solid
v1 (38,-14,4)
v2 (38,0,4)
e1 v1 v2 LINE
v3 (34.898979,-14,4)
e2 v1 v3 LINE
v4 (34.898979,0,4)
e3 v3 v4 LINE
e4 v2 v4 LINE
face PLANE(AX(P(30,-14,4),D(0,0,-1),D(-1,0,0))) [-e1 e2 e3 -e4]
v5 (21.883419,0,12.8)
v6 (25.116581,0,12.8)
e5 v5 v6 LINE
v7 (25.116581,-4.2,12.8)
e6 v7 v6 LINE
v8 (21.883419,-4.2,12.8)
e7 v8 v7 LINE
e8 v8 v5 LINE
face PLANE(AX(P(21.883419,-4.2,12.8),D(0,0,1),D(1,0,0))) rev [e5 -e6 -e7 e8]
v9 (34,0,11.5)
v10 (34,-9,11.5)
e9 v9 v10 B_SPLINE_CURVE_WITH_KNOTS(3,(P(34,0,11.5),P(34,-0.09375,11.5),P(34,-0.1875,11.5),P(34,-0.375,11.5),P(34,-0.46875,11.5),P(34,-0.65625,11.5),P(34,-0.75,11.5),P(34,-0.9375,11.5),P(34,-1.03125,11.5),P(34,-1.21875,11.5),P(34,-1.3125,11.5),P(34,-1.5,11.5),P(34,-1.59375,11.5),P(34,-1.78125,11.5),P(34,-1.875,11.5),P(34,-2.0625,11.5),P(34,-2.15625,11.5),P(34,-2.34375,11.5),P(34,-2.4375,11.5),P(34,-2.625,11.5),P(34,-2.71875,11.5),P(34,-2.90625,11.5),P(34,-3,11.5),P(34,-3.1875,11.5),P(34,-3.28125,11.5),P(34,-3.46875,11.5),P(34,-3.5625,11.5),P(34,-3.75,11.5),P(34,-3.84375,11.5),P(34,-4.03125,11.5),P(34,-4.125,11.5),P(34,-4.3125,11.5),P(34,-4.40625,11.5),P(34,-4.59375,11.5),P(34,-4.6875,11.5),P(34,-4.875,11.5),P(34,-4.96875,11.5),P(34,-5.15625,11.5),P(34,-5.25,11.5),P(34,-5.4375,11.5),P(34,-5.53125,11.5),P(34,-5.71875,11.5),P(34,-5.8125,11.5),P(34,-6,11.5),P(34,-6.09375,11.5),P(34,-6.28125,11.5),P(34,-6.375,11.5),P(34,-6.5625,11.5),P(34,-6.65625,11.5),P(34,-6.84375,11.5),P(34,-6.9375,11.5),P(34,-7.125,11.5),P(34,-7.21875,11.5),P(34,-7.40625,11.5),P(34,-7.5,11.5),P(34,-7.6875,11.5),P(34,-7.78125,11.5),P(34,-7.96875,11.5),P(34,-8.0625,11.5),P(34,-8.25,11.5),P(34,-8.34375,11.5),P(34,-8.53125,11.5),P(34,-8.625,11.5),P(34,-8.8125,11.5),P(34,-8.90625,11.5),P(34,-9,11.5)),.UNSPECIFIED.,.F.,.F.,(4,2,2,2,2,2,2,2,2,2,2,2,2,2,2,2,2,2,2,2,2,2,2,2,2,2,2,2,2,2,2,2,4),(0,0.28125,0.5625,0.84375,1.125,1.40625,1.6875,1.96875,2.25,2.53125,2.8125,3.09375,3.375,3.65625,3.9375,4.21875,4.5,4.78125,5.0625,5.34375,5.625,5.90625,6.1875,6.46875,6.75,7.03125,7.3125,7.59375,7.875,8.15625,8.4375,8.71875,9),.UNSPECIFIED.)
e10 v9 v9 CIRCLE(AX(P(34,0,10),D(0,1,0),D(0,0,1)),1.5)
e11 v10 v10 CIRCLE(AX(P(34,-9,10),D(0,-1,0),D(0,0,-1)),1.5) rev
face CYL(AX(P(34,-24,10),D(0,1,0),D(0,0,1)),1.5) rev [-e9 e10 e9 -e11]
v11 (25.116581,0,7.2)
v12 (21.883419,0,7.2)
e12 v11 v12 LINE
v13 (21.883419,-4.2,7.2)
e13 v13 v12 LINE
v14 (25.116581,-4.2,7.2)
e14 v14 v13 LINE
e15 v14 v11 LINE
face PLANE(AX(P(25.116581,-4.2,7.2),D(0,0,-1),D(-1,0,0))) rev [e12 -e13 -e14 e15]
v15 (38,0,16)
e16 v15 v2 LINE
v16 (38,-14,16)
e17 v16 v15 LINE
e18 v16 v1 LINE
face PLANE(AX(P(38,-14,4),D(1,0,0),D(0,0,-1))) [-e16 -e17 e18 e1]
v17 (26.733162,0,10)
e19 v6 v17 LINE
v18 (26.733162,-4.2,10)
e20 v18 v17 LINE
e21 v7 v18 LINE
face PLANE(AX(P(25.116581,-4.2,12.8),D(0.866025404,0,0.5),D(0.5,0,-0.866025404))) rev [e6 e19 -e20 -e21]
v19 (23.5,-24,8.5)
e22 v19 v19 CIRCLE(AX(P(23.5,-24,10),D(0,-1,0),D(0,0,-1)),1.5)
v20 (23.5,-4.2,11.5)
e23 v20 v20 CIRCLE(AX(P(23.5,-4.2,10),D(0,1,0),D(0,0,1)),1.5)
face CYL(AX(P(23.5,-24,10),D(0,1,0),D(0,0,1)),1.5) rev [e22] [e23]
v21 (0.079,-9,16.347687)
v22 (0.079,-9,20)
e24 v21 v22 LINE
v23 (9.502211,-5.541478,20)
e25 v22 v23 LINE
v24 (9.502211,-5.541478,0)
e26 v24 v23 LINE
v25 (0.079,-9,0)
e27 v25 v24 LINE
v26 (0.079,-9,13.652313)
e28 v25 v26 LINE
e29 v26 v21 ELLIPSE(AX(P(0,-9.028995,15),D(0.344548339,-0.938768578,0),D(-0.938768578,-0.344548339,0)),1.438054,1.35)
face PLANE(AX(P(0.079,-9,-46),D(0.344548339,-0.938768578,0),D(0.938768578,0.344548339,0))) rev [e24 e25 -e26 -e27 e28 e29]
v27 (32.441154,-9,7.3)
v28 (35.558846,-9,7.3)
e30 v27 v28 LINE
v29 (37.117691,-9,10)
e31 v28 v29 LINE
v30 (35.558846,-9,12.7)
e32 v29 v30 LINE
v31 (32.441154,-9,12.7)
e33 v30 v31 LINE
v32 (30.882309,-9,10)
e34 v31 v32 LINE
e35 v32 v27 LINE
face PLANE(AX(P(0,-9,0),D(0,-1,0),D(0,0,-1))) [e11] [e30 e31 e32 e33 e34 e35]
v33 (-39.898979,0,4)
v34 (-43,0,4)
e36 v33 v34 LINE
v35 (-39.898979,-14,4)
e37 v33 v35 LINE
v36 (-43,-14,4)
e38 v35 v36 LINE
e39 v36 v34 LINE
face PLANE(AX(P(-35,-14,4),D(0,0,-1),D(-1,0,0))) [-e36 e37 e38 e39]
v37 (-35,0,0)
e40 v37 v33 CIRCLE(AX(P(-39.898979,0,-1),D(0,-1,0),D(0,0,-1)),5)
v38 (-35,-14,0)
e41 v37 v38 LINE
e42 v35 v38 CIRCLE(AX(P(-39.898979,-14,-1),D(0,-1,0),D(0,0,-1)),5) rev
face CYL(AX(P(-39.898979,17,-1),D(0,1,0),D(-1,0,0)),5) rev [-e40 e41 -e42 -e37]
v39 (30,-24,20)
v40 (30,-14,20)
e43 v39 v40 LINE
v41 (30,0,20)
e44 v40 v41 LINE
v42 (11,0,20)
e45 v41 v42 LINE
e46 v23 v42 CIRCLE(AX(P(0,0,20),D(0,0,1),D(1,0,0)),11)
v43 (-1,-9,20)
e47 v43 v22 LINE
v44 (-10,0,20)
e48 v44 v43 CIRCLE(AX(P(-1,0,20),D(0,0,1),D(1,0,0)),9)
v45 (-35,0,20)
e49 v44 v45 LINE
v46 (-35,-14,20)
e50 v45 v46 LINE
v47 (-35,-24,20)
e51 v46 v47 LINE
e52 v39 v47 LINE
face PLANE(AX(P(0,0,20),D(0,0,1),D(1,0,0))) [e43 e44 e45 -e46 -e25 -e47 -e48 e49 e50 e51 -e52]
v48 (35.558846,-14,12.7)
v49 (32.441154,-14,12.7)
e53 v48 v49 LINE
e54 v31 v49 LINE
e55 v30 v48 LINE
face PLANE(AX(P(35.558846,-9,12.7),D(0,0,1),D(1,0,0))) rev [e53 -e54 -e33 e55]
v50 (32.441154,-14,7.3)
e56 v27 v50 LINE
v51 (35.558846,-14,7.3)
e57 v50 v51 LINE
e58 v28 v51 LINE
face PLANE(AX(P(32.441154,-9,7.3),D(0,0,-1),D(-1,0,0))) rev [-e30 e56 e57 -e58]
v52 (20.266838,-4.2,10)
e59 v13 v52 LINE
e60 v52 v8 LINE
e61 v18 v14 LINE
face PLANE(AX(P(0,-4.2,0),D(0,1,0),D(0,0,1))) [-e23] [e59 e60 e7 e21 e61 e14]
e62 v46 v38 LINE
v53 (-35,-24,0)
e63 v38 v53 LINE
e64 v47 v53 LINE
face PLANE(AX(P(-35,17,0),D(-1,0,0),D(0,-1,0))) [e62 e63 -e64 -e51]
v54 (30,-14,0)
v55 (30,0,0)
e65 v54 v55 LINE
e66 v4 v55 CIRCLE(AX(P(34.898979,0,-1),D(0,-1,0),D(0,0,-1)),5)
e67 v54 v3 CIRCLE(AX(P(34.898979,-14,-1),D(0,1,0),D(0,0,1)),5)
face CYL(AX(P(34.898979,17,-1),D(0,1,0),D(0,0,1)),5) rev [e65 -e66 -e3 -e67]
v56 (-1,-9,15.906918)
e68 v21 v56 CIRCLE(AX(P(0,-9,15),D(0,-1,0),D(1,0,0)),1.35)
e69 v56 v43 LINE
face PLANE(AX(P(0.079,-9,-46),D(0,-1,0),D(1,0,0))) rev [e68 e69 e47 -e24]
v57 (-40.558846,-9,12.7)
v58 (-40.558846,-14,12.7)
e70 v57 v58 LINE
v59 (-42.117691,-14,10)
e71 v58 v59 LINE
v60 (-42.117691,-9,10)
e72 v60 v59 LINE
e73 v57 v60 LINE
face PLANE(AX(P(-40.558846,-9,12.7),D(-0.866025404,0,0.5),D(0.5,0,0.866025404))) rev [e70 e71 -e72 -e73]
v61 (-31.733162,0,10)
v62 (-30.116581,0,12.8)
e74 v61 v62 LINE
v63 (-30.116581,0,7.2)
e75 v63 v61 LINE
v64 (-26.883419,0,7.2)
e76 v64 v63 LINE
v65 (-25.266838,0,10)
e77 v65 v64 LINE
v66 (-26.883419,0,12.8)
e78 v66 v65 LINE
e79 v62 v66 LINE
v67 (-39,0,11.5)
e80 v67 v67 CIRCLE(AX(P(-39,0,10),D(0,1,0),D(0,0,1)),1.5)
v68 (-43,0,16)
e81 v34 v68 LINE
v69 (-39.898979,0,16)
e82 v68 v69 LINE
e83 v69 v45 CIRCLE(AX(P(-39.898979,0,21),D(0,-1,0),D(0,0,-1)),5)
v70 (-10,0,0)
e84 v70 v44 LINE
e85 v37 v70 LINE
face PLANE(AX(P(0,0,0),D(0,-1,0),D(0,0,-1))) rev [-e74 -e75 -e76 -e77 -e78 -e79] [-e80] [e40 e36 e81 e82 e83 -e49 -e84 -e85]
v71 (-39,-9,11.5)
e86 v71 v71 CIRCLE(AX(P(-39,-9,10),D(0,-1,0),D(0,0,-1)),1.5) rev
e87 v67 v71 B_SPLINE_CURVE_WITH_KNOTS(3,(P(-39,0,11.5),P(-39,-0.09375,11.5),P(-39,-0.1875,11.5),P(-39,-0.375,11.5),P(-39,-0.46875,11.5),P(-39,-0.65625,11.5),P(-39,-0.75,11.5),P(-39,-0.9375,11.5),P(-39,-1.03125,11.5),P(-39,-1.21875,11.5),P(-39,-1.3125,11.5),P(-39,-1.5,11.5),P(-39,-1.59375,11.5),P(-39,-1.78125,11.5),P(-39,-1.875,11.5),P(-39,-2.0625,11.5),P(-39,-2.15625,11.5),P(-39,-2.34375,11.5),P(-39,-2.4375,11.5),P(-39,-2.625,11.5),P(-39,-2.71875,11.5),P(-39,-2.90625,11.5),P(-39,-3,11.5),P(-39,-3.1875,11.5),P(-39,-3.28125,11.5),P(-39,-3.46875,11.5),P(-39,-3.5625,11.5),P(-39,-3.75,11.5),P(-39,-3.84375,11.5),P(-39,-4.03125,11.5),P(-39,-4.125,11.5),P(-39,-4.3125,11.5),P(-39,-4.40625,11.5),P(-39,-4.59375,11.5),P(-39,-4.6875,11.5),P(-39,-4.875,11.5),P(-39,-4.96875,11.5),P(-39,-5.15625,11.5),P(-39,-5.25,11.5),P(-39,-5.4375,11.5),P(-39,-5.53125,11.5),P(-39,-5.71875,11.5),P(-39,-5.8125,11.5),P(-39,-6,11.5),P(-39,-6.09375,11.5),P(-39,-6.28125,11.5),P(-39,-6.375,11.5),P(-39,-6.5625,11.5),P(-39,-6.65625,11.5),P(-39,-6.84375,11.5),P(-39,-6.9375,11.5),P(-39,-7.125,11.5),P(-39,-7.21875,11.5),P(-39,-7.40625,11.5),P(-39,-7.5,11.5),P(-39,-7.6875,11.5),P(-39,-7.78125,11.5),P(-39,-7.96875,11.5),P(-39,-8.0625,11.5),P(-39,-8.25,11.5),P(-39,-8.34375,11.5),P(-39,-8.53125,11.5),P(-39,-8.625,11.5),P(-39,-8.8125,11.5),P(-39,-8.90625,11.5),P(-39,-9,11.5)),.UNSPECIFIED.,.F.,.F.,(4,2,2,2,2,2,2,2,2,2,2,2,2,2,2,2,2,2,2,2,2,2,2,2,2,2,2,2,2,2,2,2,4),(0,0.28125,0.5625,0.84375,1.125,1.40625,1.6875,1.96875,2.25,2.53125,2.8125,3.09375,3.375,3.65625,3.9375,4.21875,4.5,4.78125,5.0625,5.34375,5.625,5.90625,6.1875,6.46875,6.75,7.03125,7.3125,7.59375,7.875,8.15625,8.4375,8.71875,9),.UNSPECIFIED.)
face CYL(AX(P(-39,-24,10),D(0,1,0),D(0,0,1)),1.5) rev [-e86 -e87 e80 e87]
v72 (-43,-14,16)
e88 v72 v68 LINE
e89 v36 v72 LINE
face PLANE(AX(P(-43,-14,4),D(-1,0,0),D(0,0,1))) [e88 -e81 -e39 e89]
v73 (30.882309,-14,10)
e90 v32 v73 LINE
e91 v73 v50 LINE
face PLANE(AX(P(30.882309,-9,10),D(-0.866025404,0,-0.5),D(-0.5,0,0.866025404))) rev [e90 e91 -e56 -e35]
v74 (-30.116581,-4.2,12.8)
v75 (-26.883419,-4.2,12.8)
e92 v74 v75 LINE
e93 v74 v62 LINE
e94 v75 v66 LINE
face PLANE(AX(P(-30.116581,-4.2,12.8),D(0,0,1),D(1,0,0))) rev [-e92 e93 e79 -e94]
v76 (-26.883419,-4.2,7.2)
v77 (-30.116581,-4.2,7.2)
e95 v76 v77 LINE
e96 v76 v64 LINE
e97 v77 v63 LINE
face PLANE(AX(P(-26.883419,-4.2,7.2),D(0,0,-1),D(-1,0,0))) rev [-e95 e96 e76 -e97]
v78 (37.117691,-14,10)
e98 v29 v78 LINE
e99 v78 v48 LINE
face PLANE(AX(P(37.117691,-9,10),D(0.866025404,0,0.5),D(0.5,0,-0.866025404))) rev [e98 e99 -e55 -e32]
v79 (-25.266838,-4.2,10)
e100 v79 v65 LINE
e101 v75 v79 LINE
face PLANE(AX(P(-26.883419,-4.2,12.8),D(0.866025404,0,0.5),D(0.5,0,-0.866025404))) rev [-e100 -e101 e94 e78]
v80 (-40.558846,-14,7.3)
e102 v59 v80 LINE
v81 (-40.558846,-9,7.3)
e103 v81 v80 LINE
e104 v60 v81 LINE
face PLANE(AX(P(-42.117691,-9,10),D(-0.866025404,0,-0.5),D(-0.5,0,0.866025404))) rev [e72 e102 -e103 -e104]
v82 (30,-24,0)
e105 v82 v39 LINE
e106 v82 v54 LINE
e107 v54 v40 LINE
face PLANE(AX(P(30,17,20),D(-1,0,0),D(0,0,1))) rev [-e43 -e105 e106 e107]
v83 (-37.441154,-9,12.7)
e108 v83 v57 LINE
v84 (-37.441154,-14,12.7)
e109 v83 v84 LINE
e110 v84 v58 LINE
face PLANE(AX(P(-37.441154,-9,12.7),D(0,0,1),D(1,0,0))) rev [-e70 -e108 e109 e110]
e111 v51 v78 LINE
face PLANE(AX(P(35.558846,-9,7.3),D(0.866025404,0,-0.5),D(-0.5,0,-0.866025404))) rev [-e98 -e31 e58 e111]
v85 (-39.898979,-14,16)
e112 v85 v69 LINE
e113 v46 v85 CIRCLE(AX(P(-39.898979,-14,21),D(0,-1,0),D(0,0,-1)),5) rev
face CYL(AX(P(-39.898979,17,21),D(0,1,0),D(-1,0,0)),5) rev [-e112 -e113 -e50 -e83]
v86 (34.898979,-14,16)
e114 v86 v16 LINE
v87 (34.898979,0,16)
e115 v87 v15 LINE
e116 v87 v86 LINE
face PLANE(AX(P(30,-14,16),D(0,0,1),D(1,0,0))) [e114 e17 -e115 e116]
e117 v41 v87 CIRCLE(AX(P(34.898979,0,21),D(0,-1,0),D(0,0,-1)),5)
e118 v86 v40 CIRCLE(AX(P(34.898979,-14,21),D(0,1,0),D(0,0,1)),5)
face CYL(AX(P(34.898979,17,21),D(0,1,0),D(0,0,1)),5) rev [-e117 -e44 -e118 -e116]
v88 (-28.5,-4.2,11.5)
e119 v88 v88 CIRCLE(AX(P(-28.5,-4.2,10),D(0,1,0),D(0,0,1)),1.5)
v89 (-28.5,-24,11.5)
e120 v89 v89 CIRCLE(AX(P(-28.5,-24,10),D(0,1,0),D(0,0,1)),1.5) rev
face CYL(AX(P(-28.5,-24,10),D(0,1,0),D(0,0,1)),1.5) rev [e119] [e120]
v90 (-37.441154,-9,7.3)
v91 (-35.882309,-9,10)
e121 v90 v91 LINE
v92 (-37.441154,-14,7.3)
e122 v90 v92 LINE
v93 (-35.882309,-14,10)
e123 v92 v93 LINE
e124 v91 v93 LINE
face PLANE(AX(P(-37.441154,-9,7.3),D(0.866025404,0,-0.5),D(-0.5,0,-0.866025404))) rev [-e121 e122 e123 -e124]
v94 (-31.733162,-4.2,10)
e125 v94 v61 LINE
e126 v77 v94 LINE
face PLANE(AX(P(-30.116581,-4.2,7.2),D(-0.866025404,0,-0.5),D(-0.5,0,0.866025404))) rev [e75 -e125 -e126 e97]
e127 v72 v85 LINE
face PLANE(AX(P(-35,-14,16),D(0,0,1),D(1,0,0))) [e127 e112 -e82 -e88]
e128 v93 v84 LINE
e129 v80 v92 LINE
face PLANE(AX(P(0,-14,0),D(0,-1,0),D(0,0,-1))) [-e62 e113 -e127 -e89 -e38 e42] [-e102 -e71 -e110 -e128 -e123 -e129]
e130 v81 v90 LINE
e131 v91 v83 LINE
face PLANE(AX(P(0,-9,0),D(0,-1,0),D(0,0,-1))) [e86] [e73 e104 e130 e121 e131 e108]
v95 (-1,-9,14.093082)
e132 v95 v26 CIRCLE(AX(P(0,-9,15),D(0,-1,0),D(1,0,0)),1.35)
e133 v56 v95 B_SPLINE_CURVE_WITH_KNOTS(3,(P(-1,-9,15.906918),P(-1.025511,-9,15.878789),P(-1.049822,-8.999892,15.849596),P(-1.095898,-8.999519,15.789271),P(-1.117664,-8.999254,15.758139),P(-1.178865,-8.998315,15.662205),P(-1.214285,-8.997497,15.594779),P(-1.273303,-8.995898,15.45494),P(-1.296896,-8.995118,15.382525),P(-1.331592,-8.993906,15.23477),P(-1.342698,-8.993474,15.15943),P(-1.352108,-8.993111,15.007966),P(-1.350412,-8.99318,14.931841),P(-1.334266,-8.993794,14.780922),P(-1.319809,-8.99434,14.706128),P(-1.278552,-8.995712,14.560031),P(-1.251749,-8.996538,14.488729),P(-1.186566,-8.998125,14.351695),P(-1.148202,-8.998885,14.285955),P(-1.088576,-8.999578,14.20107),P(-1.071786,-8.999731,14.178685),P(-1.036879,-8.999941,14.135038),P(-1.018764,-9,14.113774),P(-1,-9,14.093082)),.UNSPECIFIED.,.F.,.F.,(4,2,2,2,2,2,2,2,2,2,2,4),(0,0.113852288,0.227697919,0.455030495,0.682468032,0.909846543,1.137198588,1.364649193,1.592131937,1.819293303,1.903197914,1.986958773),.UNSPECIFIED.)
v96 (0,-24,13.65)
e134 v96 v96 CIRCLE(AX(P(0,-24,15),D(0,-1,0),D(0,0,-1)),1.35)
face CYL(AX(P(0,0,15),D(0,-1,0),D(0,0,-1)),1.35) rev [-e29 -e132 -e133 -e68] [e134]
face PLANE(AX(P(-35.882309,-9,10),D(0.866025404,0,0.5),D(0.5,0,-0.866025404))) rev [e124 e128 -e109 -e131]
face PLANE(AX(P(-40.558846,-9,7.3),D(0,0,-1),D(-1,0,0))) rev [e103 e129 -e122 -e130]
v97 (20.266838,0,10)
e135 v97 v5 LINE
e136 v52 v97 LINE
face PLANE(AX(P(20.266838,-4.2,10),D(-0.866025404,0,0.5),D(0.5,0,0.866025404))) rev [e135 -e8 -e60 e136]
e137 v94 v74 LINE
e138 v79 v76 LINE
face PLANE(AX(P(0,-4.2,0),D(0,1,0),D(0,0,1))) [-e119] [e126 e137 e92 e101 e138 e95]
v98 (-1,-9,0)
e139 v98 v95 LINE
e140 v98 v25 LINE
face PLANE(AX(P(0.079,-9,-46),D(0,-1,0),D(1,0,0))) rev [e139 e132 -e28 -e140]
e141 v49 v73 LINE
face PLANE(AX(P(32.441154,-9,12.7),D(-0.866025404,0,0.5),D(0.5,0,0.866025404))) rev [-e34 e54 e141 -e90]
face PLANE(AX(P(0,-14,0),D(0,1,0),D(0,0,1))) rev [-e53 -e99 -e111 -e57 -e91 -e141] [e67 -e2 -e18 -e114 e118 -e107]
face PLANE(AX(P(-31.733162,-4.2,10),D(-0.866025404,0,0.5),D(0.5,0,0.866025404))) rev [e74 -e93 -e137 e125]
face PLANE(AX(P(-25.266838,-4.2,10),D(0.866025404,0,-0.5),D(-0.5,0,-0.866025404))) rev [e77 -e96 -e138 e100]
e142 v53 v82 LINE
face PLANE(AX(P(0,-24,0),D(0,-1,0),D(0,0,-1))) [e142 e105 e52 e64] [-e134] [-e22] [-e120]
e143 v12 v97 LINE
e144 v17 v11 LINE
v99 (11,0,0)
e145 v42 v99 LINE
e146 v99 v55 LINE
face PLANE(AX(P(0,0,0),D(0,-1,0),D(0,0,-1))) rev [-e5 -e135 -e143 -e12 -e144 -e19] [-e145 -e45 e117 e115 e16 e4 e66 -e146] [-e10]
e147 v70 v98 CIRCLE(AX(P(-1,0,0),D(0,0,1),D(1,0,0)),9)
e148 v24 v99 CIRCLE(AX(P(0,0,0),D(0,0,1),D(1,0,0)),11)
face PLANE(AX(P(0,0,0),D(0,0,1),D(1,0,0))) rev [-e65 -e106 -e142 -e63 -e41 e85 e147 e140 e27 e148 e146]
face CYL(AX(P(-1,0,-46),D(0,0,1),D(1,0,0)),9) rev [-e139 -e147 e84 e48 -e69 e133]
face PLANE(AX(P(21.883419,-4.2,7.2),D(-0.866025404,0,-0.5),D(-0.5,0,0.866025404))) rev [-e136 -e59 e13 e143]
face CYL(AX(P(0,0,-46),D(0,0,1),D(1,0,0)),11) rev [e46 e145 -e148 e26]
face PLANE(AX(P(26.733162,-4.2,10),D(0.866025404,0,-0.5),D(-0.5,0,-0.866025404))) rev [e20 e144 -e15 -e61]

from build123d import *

# Parameters (mm, degrees)
SKETCH_1_W           = 60
SKETCH_1_H           = 34
EXTRUDE_1_DEPTH      = 20
CUT_EXTRUDE_8_DEPTH  = 66
SKETCH_20_W          = 5
SKETCH_20_H          = 34
EXTRUDE_7_DEPTH      = 20
SKETCH_22_W          = 65
SKETCH_22_H          = 20
EXTRUDE_8_DEPTH      = 7
SKETCH_21_R          = 1.5
CUT_EXTRUDE_13_DEPTH = 58.497826046
CUT_EXTRUDE_START    = -41
SKETCH_23_W          = 65
SKETCH_23_H          = 20
CUT_EXTRUDE_14_DEPTH = 17
CUT_EXTRUDE_16_DEPTH = 4.2
SKETCH_27_W          = 8
SKETCH_27_H          = 12
EXTRUDE_10_DEPTH     = 14
SKETCH_30_R          = 1.5
CUT_EXTRUDE_18_DEPTH = 54.150729064
FILLET_6_R           = 5
CUT_EXTRUDE_22_DEPTH = 5
SKETCH_36_R          = 1.35
CUT_EXTRUDE_23_DEPTH = 54.150729064


with BuildPart() as part:
    # 草图1 → 凸台-拉伸1 (new body)
    with BuildSketch(Plane.XY):
        Rectangle(SKETCH_1_W, SKETCH_1_H)
    extrude(amount=EXTRUDE_1_DEPTH)

    # 草图19 → 切除-拉伸8 (cut)
    with BuildSketch(Plane.XY.offset(20)):
        with BuildLine():
            Line((0, 9), (-1, 9))
            ThreePointArc((-1, 9), (-10, 0), (-1, -9))
            Line((-1, -9), (0.07899986, -9))
            Line((0.07899986, -9), (9.502211487, -5.541477859))
            ThreePointArc((9.502211487, -5.541477859), (11, 0), (9.502211487, 5.541477859))
            Line((9.502211487, 5.541477859), (0, 9))
        make_face()
    extrude(amount=-CUT_EXTRUDE_8_DEPTH, mode=Mode.SUBTRACT)

    # 草图20 → 凸台-拉伸7 (add)
    with BuildSketch(Plane.XY.offset(20)):
        with Locations((-32.5, 0)):
            Rectangle(SKETCH_20_W, SKETCH_20_H)
    extrude(amount=-EXTRUDE_7_DEPTH)

    # 草图22 → 凸台-拉伸8 (add)
    with BuildSketch(Plane.XZ.offset(17)):
        with Locations((-2.5, 10)):
            Rectangle(SKETCH_22_W, SKETCH_22_H)
    extrude(amount=EXTRUDE_8_DEPTH)

    # 草图21 → 切除-拉伸13 (cut, through all)
    with BuildSketch(Plane.XZ.offset(-17)):
        with Locations(Location((-28.5, 10, 0), (0, 0, 90))):
            Circle(SKETCH_21_R)
        with Locations(Location((23.5, 10, 0), (0, 0, 270))):
            Circle(SKETCH_21_R)
    extrude(amount=CUT_EXTRUDE_13_DEPTH, mode=Mode.SUBTRACT)

    # 草图23 → 切除-拉伸14 (cut)
    with BuildSketch(Plane.XZ.offset(24).offset(CUT_EXTRUDE_START)):
        with Locations((-2.5, 10)):
            Rectangle(SKETCH_23_W, SKETCH_23_H)
    extrude(amount=CUT_EXTRUDE_14_DEPTH, mode=Mode.SUBTRACT)

    # 草图25 → 切除-拉伸16 (cut)
    with BuildSketch(Plane(origin=(0, 0, 0), x_dir=(1, 0, 0), z_dir=(0, 1, 0))):
        Polygon((26.733161507, -10), (25.116580754, -7.2), (21.883419246, -7.2), (20.266838493, -10), (21.883419246, -12.8), (25.116580754, -12.8), align=None)
        Polygon((-25.266838493, -10), (-26.883419246, -7.2), (-30.116580754, -7.2), (-31.733161507, -10), (-30.116580754, -12.8), (-26.883419246, -12.8), align=None)
    extrude(amount=-CUT_EXTRUDE_16_DEPTH, mode=Mode.SUBTRACT)

    # 草图27 → 凸台-拉伸10 (add)
    with BuildSketch(Plane(origin=(0, 0, 0), x_dir=(1, 0, 0), z_dir=(0, 1, 0))):
        with Locations((34, -10)):
            Rectangle(SKETCH_27_W, SKETCH_27_H)
        with Locations((-39, -10)):
            Rectangle(SKETCH_27_W, SKETCH_27_H)
    extrude(amount=-EXTRUDE_10_DEPTH)

    # 草图30 → 切除-拉伸18 (cut, through all)
    with BuildSketch(Plane(origin=(0, 0, 0), x_dir=(1, 0, 0), z_dir=(0, 1, 0))):
        with Locations(Location((34, -10, 0), (0, 0, 270))):
            Circle(SKETCH_30_R)
        with Locations(Location((-39, -10, 0), (0, 0, 270))):
            Circle(SKETCH_30_R)
    extrude(amount=-CUT_EXTRUDE_18_DEPTH, mode=Mode.SUBTRACT)

    # 圆角6
    # the kernel refuses this fillet: 5 mm, written as the material it adds along each edge
    with BuildSketch(Plane(origin=(-35, 0, 4), x_dir=(-1.5685230891899147e-12, 0, -1.0), z_dir=(0, -1, 0)), Plane(origin=(30, 0, 16), x_dir=(1.5978329770400045e-12, 0, 1.0), z_dir=(0, -1, 0))) as fillet_6_piece_1:
        with BuildLine():
            CenterArc((5, -4.898979486), FILLET_6_R, 101.536959033, 78.463040967)
            Line((0, -4.898979486), (-0.1, -4.898979486))
            Line((-0.1, -4.898979486), (-0.1, 0))
            Line((-0.1, 0), (0, 0.1))
            ThreePointArc((0, 0.1), (2, 0.1), (3.98, 0.09797959))
            Line((3.98, 0.09797959), (4, 0))
        make_face()
    extrude(amount=14)
    with BuildSketch(Plane(origin=(-35, 0, 16), x_dir=(-1.596944798620306e-12, 0, 1.0), z_dir=(0, -1, 0)), Plane(origin=(30, 0, 4), x_dir=(1.5702994460293186e-12, 0, -1.0), z_dir=(0, -1, 0))) as fillet_6_piece_2:
        with BuildLine():
            CenterArc((5, 4.898979486), FILLET_6_R, 180, 78.463040967)
            Line((0, 4.898979486), (-0.1, 4.898979486))
            Line((-0.1, 4.898979486), (-0.1, 0))
            Line((-0.1, 0), (0, -0.1))
            ThreePointArc((0, -0.1), (2, -0.1), (3.98, -0.09797959))
            Line((3.98, -0.09797959), (4, 0))
        make_face()
    extrude(amount=14)

    # 草图35 → 切除-拉伸22 (cut)
    with BuildSketch(Plane.XZ.offset(14)):
        Polygon((37.117691454, 10), (35.558845727, 12.7), (32.441154273, 12.7), (30.882308546, 10), (32.441154273, 7.3), (35.558845727, 7.3), align=None)
        Polygon((-35.882308546, 10), (-37.441154273, 12.7), (-40.558845727, 12.7), (-42.117691454, 10), (-40.558845727, 7.3), (-37.441154273, 7.3), align=None)
    extrude(amount=-CUT_EXTRUDE_22_DEPTH, mode=Mode.SUBTRACT)

    # 草图36 → 切除-拉伸23 (cut, through all)
    with BuildSketch(Plane.XZ.offset(24)):
        with Locations(Location((0, 15, 0), (0, 0, 270))):
            Circle(SKETCH_36_R)
    extrude(amount=-CUT_EXTRUDE_23_DEPTH, mode=Mode.SUBTRACT)


solid = part.part
